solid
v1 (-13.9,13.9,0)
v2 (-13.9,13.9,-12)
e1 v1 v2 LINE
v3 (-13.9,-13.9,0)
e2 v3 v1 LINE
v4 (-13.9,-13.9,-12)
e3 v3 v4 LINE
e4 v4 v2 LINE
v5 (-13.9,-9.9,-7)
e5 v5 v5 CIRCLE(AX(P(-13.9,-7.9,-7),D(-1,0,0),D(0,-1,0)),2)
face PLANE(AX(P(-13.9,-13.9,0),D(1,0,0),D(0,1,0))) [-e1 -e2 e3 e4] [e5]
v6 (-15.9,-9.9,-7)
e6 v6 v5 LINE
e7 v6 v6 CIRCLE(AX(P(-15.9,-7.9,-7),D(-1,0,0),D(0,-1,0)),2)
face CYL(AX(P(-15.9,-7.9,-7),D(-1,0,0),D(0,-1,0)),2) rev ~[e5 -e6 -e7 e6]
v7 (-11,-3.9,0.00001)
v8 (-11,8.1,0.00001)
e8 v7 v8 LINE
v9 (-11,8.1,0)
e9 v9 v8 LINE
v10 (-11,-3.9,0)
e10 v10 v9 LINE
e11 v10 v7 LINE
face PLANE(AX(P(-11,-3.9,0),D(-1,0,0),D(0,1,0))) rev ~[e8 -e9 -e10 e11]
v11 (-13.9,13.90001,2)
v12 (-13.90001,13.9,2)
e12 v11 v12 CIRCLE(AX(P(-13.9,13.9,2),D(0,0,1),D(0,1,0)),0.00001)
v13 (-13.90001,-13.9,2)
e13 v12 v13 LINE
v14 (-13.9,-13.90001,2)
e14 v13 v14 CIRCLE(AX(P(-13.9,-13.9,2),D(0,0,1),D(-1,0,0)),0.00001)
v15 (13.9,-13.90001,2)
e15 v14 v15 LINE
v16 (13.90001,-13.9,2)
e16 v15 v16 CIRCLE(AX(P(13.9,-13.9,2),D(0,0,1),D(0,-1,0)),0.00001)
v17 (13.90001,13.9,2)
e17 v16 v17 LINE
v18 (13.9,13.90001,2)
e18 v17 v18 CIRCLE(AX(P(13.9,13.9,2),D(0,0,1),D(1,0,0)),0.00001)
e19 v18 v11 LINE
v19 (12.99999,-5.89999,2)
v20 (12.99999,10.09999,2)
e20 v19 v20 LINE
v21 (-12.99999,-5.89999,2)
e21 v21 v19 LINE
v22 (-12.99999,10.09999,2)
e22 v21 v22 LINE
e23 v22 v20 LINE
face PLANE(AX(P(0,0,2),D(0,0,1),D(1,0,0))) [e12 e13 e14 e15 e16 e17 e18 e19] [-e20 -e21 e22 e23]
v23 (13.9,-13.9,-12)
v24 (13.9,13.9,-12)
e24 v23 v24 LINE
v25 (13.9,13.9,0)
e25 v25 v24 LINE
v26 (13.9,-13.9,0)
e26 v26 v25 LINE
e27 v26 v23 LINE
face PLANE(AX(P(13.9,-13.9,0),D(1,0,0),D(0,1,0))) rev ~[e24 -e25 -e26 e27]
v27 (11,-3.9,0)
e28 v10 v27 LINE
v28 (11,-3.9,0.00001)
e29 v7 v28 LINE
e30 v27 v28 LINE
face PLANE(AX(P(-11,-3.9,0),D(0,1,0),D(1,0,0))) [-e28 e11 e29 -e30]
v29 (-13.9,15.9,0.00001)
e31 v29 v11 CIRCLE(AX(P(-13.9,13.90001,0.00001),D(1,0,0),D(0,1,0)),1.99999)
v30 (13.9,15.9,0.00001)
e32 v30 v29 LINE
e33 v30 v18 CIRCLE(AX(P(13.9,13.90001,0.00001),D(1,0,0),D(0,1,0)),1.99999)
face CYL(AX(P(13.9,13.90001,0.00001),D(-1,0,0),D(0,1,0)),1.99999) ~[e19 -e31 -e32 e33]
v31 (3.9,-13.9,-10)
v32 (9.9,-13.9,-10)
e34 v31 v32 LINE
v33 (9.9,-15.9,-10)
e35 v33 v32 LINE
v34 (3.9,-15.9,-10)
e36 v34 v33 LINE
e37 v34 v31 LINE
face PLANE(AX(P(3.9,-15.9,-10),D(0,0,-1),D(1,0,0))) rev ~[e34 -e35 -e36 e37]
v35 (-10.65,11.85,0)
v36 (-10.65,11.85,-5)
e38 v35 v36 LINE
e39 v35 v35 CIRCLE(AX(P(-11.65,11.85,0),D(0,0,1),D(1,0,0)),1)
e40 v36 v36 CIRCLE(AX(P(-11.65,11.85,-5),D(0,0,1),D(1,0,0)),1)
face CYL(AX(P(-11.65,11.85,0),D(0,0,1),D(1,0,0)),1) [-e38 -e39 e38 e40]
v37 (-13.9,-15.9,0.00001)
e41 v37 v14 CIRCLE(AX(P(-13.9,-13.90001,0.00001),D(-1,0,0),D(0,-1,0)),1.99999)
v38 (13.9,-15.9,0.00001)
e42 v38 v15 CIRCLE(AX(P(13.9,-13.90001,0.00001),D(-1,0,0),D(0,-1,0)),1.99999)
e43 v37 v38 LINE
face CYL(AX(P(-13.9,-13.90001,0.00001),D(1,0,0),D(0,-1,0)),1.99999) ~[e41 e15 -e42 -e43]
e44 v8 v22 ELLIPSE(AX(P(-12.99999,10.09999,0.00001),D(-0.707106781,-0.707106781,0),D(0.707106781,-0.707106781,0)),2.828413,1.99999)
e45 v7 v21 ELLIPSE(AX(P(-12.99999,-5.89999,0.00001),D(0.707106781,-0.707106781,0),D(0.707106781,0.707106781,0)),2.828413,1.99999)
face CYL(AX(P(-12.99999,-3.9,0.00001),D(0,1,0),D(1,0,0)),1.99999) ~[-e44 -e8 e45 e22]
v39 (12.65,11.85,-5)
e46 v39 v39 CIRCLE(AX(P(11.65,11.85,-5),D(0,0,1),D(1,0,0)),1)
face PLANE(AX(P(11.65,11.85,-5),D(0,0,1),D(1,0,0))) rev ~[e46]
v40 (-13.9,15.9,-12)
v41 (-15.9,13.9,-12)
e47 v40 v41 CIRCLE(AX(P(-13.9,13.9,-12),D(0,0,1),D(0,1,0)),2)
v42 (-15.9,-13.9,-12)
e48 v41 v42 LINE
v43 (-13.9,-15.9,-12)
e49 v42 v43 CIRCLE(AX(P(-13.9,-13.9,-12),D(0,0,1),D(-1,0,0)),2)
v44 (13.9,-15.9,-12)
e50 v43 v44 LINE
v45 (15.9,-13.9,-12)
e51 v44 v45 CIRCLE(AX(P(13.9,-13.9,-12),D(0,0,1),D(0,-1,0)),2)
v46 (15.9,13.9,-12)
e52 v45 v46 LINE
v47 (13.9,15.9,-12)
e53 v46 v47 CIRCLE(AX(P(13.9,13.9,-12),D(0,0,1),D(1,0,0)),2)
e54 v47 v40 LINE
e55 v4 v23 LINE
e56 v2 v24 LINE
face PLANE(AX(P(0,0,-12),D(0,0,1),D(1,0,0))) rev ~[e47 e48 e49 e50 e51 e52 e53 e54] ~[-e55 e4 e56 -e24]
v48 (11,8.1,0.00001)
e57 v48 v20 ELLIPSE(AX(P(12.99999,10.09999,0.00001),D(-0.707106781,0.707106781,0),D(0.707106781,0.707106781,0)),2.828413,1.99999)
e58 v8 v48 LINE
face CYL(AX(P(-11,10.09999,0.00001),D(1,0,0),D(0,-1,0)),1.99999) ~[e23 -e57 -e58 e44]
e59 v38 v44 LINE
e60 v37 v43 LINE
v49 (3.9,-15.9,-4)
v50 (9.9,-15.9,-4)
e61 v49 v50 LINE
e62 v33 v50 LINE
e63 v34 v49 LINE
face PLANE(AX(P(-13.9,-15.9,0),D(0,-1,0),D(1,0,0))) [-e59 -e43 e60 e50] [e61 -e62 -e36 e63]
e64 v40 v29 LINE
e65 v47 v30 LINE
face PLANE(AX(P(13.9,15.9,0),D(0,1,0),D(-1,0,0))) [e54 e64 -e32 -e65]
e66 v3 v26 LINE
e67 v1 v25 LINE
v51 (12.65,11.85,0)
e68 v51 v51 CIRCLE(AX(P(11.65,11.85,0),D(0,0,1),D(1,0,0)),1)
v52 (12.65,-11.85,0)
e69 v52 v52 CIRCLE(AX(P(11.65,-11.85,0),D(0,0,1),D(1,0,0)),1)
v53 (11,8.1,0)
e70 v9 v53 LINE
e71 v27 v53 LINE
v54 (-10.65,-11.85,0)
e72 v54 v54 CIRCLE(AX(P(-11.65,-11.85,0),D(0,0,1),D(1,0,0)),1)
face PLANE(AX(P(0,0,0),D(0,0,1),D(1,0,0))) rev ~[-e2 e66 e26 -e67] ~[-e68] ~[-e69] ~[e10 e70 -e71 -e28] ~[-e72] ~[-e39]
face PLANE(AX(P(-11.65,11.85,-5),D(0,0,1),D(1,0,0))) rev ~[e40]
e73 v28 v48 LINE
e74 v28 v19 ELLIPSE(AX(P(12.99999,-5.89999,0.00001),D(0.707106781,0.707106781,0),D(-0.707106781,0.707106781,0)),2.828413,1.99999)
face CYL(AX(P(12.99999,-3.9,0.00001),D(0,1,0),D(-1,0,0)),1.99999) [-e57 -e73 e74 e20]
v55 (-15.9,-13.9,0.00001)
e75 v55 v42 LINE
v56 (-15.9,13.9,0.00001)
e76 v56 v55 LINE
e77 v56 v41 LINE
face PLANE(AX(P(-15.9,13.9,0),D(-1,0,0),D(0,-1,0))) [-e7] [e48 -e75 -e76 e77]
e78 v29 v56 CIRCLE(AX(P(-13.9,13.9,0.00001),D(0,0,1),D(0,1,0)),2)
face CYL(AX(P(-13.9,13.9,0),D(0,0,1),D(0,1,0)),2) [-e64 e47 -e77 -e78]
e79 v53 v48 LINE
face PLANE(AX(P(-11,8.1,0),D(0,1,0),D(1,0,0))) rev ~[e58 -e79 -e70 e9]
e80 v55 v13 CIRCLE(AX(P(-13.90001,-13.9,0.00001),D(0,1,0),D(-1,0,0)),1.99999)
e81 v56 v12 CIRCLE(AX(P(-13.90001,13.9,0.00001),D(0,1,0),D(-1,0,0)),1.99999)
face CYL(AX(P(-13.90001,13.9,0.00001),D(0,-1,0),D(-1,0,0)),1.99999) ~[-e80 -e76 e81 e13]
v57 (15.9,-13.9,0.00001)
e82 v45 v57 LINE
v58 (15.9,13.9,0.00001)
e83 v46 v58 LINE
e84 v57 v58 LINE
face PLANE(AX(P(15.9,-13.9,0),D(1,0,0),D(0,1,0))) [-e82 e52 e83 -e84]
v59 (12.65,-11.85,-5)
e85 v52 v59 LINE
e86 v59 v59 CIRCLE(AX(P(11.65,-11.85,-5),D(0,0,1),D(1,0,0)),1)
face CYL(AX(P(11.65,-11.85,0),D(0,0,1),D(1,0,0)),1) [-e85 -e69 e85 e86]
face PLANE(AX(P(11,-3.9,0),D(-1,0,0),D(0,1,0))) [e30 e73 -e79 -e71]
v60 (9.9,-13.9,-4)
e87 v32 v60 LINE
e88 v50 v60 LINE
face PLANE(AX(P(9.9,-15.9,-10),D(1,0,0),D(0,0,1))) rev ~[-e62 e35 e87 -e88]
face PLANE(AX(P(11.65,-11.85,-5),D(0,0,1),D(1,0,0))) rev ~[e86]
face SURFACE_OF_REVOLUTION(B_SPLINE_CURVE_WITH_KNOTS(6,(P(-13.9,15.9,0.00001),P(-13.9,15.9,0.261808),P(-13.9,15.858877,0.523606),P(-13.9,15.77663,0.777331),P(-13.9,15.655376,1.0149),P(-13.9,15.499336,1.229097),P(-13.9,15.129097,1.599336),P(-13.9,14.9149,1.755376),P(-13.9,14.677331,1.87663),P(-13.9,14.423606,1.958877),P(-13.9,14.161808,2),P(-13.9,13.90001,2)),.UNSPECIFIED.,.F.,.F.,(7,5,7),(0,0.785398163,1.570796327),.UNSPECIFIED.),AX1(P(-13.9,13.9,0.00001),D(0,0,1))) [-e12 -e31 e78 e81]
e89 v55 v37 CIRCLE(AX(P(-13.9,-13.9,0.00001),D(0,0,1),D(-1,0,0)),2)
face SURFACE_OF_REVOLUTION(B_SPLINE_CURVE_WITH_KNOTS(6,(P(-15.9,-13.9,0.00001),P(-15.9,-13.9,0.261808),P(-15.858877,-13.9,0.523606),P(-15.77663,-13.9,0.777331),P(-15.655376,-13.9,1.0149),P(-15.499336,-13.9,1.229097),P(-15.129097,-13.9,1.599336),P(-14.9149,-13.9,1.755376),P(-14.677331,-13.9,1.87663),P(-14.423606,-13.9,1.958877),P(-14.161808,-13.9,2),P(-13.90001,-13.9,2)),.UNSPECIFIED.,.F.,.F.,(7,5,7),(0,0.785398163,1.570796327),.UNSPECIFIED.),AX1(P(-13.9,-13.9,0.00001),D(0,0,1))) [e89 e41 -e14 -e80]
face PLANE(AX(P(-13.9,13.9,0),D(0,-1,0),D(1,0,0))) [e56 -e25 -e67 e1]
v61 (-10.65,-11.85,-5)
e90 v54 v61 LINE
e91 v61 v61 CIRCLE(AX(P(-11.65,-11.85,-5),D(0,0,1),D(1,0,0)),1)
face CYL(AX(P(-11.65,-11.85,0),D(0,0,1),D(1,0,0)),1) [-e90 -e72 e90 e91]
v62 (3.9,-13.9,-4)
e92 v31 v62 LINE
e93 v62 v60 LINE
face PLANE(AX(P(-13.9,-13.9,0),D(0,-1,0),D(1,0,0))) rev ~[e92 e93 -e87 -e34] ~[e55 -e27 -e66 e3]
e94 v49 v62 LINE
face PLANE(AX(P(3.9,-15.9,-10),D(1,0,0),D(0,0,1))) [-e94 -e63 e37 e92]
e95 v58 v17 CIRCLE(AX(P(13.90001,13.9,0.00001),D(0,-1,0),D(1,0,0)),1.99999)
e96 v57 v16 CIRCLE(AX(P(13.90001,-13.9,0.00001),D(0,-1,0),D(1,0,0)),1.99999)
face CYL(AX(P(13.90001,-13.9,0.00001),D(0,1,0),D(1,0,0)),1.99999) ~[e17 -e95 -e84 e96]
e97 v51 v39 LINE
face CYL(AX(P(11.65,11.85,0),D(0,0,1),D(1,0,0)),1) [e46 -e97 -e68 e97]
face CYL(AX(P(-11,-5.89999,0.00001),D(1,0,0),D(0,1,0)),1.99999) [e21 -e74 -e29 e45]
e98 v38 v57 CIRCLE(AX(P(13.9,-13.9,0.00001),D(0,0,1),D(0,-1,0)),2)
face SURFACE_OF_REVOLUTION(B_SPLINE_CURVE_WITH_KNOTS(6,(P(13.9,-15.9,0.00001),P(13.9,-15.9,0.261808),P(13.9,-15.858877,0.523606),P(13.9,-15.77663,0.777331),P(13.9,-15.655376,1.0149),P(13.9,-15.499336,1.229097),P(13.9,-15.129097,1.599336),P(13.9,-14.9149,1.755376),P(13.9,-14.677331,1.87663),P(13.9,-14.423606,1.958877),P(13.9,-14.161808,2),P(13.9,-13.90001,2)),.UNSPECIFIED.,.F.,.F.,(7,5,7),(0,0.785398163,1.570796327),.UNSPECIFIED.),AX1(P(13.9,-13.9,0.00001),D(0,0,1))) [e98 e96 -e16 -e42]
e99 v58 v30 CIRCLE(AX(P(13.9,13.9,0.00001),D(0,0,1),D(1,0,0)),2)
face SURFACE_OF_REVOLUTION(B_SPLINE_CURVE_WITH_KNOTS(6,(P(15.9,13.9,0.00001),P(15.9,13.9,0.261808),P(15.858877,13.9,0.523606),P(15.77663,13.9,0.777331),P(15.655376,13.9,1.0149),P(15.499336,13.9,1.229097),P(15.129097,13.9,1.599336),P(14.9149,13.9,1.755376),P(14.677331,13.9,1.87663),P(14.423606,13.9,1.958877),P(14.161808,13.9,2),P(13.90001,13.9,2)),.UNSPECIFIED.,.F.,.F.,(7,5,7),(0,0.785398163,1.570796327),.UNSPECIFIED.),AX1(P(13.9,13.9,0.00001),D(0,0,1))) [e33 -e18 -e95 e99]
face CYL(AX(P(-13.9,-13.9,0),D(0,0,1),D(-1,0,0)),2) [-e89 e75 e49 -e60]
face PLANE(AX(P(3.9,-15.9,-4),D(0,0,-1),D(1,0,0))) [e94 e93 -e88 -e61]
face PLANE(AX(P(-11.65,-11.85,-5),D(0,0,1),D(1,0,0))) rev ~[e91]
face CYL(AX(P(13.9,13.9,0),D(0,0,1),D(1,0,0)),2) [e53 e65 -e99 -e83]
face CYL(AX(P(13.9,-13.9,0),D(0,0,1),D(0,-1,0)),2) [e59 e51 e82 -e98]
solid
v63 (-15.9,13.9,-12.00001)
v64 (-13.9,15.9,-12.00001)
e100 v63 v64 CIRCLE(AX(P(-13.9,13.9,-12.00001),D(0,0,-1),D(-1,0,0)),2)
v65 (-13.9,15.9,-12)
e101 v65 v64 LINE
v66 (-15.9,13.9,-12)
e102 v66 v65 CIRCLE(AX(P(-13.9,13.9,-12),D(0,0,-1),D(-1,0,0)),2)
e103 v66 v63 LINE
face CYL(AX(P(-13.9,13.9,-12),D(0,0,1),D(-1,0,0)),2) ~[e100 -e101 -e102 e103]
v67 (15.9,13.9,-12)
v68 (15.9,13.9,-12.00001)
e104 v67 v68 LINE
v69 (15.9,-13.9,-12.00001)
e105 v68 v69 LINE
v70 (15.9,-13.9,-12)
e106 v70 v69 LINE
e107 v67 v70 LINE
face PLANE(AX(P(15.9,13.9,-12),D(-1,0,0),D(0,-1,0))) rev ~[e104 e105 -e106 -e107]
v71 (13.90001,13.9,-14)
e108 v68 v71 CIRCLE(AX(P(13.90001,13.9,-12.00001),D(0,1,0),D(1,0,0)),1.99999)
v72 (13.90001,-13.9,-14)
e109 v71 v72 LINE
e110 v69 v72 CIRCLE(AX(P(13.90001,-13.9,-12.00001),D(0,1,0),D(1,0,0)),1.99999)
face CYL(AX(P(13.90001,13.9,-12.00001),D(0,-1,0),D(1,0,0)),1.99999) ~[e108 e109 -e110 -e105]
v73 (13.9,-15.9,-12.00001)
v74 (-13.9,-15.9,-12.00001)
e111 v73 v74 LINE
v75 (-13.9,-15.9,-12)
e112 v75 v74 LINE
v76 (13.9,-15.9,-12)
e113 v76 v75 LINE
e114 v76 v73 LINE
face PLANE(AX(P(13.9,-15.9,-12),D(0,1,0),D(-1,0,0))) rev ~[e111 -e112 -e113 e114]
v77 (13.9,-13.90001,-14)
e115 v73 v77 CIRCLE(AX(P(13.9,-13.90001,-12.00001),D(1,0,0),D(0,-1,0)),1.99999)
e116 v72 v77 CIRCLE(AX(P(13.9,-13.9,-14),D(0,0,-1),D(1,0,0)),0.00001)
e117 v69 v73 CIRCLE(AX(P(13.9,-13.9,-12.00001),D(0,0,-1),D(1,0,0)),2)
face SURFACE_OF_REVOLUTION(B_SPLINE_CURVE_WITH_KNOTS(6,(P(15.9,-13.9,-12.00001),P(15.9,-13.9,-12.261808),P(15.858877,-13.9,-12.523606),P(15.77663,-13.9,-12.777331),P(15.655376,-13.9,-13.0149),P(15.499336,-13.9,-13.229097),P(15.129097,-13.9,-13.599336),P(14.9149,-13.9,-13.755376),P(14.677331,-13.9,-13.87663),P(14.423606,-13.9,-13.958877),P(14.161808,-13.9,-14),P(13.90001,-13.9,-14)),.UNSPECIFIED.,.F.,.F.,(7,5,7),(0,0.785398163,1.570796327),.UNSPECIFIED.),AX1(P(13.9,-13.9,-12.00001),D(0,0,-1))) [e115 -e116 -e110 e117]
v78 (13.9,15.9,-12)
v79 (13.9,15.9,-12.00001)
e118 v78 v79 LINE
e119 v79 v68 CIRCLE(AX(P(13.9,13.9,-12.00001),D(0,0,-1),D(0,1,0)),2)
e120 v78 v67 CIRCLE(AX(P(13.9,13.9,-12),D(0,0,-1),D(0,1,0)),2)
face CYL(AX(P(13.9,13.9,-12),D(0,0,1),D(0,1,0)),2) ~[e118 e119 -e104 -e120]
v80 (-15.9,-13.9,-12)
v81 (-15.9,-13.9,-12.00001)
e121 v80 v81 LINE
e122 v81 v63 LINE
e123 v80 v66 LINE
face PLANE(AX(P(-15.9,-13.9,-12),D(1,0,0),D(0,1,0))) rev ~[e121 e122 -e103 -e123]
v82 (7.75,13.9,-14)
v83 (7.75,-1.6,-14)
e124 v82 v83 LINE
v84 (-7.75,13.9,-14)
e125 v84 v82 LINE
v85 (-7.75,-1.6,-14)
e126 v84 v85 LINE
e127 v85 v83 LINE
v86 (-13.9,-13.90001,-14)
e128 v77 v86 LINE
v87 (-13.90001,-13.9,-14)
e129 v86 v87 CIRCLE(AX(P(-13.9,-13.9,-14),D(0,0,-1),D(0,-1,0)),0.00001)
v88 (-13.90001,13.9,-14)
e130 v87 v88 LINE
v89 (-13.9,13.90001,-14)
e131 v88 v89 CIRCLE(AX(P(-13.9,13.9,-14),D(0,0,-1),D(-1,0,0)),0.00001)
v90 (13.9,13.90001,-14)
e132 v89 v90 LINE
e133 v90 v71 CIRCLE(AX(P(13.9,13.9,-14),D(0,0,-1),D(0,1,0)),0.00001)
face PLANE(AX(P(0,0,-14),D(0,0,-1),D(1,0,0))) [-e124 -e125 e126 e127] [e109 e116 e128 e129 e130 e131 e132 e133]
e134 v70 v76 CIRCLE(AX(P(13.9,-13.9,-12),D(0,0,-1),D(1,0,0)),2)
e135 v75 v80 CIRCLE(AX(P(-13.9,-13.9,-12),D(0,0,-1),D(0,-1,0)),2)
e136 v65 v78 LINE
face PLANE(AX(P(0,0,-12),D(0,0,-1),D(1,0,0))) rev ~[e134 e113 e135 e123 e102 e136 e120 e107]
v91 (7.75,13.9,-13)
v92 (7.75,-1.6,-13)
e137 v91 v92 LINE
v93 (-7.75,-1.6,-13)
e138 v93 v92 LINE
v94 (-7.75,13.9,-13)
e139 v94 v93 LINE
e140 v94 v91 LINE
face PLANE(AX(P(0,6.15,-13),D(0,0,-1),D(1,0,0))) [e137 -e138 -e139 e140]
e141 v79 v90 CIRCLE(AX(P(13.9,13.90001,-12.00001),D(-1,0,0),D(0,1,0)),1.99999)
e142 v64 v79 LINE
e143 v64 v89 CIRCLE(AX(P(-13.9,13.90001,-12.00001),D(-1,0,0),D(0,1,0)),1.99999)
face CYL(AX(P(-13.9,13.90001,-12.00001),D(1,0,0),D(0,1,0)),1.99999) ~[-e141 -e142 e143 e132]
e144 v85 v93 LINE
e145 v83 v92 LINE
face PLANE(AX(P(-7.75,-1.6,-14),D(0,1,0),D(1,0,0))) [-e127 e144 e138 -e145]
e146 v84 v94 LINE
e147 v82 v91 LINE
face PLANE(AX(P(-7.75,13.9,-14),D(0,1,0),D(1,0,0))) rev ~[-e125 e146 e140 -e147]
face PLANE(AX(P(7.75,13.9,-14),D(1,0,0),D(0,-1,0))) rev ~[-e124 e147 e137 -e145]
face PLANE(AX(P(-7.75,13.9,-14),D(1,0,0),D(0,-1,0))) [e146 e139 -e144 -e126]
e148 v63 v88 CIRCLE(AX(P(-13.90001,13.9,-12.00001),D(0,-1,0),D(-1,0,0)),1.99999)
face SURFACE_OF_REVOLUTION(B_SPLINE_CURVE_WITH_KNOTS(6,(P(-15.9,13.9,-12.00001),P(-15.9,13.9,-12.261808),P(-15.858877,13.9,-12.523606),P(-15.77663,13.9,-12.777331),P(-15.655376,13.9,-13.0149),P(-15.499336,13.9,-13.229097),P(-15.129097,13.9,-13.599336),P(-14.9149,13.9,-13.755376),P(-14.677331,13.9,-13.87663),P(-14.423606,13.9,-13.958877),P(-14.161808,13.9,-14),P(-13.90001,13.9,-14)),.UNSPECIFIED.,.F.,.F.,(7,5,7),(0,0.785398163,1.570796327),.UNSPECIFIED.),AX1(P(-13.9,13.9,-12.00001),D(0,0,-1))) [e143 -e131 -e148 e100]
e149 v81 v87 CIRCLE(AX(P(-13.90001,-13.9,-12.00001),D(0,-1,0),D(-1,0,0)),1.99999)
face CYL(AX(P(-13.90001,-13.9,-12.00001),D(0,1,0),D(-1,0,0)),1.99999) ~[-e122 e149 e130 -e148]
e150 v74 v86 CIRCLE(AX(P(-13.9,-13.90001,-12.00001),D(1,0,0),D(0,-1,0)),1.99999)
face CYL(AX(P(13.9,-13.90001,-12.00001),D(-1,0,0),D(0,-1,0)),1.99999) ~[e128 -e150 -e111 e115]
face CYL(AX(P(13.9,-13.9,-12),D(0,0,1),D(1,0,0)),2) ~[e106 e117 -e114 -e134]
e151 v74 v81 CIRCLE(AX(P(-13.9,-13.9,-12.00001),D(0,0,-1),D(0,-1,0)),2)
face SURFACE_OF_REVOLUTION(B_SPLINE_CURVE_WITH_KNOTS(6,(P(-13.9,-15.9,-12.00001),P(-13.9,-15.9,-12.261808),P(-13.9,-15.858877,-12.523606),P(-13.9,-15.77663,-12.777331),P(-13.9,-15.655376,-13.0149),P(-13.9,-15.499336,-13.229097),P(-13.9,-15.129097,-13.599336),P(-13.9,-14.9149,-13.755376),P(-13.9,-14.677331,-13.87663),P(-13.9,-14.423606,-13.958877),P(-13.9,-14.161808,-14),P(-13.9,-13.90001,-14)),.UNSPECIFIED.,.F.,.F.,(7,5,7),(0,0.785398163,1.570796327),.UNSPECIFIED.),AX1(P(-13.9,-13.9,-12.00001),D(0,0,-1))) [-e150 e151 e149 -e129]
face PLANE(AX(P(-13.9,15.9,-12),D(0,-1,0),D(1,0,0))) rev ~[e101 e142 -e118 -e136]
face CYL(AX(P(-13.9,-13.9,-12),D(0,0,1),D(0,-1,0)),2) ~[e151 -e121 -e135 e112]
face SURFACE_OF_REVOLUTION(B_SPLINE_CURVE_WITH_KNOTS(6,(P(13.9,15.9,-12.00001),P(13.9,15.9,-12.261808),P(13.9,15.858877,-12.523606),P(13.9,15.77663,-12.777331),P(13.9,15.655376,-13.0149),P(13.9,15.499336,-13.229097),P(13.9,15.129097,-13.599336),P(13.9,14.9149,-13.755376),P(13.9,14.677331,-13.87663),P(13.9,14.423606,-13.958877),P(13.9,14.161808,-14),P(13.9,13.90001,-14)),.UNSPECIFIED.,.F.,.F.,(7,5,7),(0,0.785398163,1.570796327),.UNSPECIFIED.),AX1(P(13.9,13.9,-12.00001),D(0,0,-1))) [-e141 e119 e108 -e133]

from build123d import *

# Parameters (mm, degrees)
F0_W      = 27.8
F0_H      = 27.8
F0_R      = 1
F0_W_2    = 22
F0_H_2    = 12
F1_DEPTH  = 2
F2_R      = 1.99999
F3_DEPTH  = 12
F4_W      = 27.8
F4_H      = 27.8
F5_DEPTH  = 2
F7_W      = 6
F7_H      = 6
F8_DEPTH  = 5
F9_R      = 2
F10_DEPTH = 5
F11_DEPTH = 5
F12_R     = 1.99999
F13_W     = 15.5
F13_H     = 15.5
F14_DEPTH = 1


# Not quite as in the source:
# - a fillet or chamfer is up to 0.001 mm smaller than in the source, because OpenCascade refuses the exact size
# - a feature names something its author has since deleted; it is built from what else it names


with BuildPart() as f1:
    # F0 (on Top) → F1 (new body)
    with BuildSketch(Plane.XY):
        with BuildLine():
            ThreePointArc((13.9, -15.9), (15.3142135624, -15.3142135624), (15.9, -13.9))
            Line((15.9, -13.9), (15.9, 13.9))
            ThreePointArc((15.9, 13.9), (15.3142135624, 15.3142135624), (13.9, 15.9))
            Line((13.9, 15.9), (-13.9, 15.9))
            ThreePointArc((-13.9, 15.9), (-15.3142135624, 15.3142135624), (-15.9, 13.9))
            Line((-15.9, 13.9), (-15.9, -13.9))
            ThreePointArc((-15.9, -13.9), (-15.3142135624, -15.3142135624), (-13.9, -15.9))
            Line((-13.9, -15.9), (13.9, -15.9))
        make_face()
        Rectangle(F0_W, F0_H, mode=Mode.SUBTRACT)
        Rectangle(F0_W, F0_H)
        with Locations((-11.65, -11.85)):
            Circle(F0_R, mode=Mode.SUBTRACT)
        with Locations((11.65, -11.85)):
            Circle(F0_R, mode=Mode.SUBTRACT)
        with Locations((0, 2.1)):
            Rectangle(F0_W_2, F0_H_2, mode=Mode.SUBTRACT)
        with Locations((-11.65, 11.85)):
            Circle(F0_R, mode=Mode.SUBTRACT)
        with Locations((11.65, 11.85)):
            Circle(F0_R, mode=Mode.SUBTRACT)
        with Locations((-11.65, -11.85)):
            Circle(F0_R)
        with Locations((11.65, -11.85)):
            Circle(F0_R)
        with Locations((11.65, 11.85)):
            Circle(F0_R)
        with Locations((-11.65, 11.85)):
            Circle(F0_R)
    extrude(amount=F1_DEPTH)

    # F2 (radius 2 in the source; OpenCascade refuses exactly that, so slightly less here)
    f2_edges = [f1.edges().sort_by_distance(p)[0] for p in [
        (0, 8.1, 2),
        (-11, 2.1, 2),
        (11, 2.1, 2),
        (0, -3.9, 2),
        (-15.9, 0, 2),
    ]]
    fillet(f2_edges, radius=F2_R)

    # F0 (on Top) → F3 (join)
    with BuildSketch(Plane.XY):
        with BuildLine():
            ThreePointArc((13.9, -15.9), (15.3142135624, -15.3142135624), (15.9, -13.9))
            Line((15.9, -13.9), (15.9, 13.9))
            ThreePointArc((15.9, 13.9), (15.3142135624, 15.3142135624), (13.9, 15.9))
            Line((13.9, 15.9), (-13.9, 15.9))
            ThreePointArc((-13.9, 15.9), (-15.3142135624, 15.3142135624), (-15.9, 13.9))
            Line((-15.9, 13.9), (-15.9, -13.9))
            ThreePointArc((-15.9, -13.9), (-15.3142135624, -15.3142135624), (-13.9, -15.9))
            Line((-13.9, -15.9), (13.9, -15.9))
        make_face()
        Rectangle(F0_W, F0_H, mode=Mode.SUBTRACT)
    extrude(amount=-F3_DEPTH)


with BuildPart() as f5:
    # F4 (on face) → F5 (new body)
    with BuildSketch(Plane(origin=(0, 0, -12), x_dir=(1, 0, 0), z_dir=(0, 0, -1))):
        with BuildLine():
            ThreePointArc((-13.9, 15.9), (-15.3142135624, 15.3142135624), (-15.9, 13.9))
            Line((-15.9, 13.9), (-15.9, -13.9))
            ThreePointArc((-15.9, -13.9), (-15.3142135624, -15.3142135624), (-13.9, -15.9))
            Line((-13.9, -15.9), (13.9, -15.9))
            ThreePointArc((13.9, -15.9), (15.3142135624, -15.3142135624), (15.9, -13.9))
            Line((15.9, -13.9), (15.9, 13.9))
            ThreePointArc((15.9, 13.9), (15.3142135624, 15.3142135624), (13.9, 15.9))
            Line((13.9, 15.9), (-13.9, 15.9))
        make_face()
        Rectangle(F4_W, F4_H, mode=Mode.SUBTRACT)
        Rectangle(F4_W, F4_H)
    extrude(amount=F5_DEPTH)

    # F6: cut F1
    add(f1.part, mode=Mode.SUBTRACT)

    # F12 (radius 2 in the source; OpenCascade refuses exactly that, so slightly less here)
    f12_edges = [f5.edges().sort_by_distance(p)[0] for p in [
        (0, -15.9, -14),
    ]]
    fillet(f12_edges, radius=F12_R)

    # F13 (on face) → F14 (cut)
    with BuildSketch(Plane(origin=(0, 0, -14), x_dir=(1, 0, 0), z_dir=(0, 0, -1))):
        with Locations((0, -6.15)):
            Rectangle(F13_W, F13_H)
    extrude(amount=-F14_DEPTH, mode=Mode.SUBTRACT)


with BuildPart() as f1_1:
    add(f1.part)

    # F7 (on face) → F8 (cut)
    with BuildSketch(Plane.XZ.offset(15.9)):
        with Locations((6.9, -7)):
            Rectangle(F7_W, F7_H)
    extrude(amount=-F8_DEPTH, mode=Mode.SUBTRACT)

    # F9 (on face) → F10 (cut)
    with BuildSketch(Plane(origin=(-15.9, 0, 0), x_dir=(0, -1, 0), z_dir=(-1, 0, 0))):
        with Locations((7.9, -7)):
            Circle(F9_R)
    extrude(amount=-F10_DEPTH, mode=Mode.SUBTRACT)

    # F0 (on Top) → F11 (join)
    with BuildSketch(Plane.XY):
        with Locations((-11.65, -11.85)):
            Circle(F0_R)
        with Locations((11.65, -11.85)):
            Circle(F0_R)
        with Locations((-11.65, 11.85)):
            Circle(F0_R)
        with Locations((11.65, 11.85)):
            Circle(F0_R)
    extrude(amount=-F11_DEPTH)


solid = Compound([f5.part, f1_1.part])
